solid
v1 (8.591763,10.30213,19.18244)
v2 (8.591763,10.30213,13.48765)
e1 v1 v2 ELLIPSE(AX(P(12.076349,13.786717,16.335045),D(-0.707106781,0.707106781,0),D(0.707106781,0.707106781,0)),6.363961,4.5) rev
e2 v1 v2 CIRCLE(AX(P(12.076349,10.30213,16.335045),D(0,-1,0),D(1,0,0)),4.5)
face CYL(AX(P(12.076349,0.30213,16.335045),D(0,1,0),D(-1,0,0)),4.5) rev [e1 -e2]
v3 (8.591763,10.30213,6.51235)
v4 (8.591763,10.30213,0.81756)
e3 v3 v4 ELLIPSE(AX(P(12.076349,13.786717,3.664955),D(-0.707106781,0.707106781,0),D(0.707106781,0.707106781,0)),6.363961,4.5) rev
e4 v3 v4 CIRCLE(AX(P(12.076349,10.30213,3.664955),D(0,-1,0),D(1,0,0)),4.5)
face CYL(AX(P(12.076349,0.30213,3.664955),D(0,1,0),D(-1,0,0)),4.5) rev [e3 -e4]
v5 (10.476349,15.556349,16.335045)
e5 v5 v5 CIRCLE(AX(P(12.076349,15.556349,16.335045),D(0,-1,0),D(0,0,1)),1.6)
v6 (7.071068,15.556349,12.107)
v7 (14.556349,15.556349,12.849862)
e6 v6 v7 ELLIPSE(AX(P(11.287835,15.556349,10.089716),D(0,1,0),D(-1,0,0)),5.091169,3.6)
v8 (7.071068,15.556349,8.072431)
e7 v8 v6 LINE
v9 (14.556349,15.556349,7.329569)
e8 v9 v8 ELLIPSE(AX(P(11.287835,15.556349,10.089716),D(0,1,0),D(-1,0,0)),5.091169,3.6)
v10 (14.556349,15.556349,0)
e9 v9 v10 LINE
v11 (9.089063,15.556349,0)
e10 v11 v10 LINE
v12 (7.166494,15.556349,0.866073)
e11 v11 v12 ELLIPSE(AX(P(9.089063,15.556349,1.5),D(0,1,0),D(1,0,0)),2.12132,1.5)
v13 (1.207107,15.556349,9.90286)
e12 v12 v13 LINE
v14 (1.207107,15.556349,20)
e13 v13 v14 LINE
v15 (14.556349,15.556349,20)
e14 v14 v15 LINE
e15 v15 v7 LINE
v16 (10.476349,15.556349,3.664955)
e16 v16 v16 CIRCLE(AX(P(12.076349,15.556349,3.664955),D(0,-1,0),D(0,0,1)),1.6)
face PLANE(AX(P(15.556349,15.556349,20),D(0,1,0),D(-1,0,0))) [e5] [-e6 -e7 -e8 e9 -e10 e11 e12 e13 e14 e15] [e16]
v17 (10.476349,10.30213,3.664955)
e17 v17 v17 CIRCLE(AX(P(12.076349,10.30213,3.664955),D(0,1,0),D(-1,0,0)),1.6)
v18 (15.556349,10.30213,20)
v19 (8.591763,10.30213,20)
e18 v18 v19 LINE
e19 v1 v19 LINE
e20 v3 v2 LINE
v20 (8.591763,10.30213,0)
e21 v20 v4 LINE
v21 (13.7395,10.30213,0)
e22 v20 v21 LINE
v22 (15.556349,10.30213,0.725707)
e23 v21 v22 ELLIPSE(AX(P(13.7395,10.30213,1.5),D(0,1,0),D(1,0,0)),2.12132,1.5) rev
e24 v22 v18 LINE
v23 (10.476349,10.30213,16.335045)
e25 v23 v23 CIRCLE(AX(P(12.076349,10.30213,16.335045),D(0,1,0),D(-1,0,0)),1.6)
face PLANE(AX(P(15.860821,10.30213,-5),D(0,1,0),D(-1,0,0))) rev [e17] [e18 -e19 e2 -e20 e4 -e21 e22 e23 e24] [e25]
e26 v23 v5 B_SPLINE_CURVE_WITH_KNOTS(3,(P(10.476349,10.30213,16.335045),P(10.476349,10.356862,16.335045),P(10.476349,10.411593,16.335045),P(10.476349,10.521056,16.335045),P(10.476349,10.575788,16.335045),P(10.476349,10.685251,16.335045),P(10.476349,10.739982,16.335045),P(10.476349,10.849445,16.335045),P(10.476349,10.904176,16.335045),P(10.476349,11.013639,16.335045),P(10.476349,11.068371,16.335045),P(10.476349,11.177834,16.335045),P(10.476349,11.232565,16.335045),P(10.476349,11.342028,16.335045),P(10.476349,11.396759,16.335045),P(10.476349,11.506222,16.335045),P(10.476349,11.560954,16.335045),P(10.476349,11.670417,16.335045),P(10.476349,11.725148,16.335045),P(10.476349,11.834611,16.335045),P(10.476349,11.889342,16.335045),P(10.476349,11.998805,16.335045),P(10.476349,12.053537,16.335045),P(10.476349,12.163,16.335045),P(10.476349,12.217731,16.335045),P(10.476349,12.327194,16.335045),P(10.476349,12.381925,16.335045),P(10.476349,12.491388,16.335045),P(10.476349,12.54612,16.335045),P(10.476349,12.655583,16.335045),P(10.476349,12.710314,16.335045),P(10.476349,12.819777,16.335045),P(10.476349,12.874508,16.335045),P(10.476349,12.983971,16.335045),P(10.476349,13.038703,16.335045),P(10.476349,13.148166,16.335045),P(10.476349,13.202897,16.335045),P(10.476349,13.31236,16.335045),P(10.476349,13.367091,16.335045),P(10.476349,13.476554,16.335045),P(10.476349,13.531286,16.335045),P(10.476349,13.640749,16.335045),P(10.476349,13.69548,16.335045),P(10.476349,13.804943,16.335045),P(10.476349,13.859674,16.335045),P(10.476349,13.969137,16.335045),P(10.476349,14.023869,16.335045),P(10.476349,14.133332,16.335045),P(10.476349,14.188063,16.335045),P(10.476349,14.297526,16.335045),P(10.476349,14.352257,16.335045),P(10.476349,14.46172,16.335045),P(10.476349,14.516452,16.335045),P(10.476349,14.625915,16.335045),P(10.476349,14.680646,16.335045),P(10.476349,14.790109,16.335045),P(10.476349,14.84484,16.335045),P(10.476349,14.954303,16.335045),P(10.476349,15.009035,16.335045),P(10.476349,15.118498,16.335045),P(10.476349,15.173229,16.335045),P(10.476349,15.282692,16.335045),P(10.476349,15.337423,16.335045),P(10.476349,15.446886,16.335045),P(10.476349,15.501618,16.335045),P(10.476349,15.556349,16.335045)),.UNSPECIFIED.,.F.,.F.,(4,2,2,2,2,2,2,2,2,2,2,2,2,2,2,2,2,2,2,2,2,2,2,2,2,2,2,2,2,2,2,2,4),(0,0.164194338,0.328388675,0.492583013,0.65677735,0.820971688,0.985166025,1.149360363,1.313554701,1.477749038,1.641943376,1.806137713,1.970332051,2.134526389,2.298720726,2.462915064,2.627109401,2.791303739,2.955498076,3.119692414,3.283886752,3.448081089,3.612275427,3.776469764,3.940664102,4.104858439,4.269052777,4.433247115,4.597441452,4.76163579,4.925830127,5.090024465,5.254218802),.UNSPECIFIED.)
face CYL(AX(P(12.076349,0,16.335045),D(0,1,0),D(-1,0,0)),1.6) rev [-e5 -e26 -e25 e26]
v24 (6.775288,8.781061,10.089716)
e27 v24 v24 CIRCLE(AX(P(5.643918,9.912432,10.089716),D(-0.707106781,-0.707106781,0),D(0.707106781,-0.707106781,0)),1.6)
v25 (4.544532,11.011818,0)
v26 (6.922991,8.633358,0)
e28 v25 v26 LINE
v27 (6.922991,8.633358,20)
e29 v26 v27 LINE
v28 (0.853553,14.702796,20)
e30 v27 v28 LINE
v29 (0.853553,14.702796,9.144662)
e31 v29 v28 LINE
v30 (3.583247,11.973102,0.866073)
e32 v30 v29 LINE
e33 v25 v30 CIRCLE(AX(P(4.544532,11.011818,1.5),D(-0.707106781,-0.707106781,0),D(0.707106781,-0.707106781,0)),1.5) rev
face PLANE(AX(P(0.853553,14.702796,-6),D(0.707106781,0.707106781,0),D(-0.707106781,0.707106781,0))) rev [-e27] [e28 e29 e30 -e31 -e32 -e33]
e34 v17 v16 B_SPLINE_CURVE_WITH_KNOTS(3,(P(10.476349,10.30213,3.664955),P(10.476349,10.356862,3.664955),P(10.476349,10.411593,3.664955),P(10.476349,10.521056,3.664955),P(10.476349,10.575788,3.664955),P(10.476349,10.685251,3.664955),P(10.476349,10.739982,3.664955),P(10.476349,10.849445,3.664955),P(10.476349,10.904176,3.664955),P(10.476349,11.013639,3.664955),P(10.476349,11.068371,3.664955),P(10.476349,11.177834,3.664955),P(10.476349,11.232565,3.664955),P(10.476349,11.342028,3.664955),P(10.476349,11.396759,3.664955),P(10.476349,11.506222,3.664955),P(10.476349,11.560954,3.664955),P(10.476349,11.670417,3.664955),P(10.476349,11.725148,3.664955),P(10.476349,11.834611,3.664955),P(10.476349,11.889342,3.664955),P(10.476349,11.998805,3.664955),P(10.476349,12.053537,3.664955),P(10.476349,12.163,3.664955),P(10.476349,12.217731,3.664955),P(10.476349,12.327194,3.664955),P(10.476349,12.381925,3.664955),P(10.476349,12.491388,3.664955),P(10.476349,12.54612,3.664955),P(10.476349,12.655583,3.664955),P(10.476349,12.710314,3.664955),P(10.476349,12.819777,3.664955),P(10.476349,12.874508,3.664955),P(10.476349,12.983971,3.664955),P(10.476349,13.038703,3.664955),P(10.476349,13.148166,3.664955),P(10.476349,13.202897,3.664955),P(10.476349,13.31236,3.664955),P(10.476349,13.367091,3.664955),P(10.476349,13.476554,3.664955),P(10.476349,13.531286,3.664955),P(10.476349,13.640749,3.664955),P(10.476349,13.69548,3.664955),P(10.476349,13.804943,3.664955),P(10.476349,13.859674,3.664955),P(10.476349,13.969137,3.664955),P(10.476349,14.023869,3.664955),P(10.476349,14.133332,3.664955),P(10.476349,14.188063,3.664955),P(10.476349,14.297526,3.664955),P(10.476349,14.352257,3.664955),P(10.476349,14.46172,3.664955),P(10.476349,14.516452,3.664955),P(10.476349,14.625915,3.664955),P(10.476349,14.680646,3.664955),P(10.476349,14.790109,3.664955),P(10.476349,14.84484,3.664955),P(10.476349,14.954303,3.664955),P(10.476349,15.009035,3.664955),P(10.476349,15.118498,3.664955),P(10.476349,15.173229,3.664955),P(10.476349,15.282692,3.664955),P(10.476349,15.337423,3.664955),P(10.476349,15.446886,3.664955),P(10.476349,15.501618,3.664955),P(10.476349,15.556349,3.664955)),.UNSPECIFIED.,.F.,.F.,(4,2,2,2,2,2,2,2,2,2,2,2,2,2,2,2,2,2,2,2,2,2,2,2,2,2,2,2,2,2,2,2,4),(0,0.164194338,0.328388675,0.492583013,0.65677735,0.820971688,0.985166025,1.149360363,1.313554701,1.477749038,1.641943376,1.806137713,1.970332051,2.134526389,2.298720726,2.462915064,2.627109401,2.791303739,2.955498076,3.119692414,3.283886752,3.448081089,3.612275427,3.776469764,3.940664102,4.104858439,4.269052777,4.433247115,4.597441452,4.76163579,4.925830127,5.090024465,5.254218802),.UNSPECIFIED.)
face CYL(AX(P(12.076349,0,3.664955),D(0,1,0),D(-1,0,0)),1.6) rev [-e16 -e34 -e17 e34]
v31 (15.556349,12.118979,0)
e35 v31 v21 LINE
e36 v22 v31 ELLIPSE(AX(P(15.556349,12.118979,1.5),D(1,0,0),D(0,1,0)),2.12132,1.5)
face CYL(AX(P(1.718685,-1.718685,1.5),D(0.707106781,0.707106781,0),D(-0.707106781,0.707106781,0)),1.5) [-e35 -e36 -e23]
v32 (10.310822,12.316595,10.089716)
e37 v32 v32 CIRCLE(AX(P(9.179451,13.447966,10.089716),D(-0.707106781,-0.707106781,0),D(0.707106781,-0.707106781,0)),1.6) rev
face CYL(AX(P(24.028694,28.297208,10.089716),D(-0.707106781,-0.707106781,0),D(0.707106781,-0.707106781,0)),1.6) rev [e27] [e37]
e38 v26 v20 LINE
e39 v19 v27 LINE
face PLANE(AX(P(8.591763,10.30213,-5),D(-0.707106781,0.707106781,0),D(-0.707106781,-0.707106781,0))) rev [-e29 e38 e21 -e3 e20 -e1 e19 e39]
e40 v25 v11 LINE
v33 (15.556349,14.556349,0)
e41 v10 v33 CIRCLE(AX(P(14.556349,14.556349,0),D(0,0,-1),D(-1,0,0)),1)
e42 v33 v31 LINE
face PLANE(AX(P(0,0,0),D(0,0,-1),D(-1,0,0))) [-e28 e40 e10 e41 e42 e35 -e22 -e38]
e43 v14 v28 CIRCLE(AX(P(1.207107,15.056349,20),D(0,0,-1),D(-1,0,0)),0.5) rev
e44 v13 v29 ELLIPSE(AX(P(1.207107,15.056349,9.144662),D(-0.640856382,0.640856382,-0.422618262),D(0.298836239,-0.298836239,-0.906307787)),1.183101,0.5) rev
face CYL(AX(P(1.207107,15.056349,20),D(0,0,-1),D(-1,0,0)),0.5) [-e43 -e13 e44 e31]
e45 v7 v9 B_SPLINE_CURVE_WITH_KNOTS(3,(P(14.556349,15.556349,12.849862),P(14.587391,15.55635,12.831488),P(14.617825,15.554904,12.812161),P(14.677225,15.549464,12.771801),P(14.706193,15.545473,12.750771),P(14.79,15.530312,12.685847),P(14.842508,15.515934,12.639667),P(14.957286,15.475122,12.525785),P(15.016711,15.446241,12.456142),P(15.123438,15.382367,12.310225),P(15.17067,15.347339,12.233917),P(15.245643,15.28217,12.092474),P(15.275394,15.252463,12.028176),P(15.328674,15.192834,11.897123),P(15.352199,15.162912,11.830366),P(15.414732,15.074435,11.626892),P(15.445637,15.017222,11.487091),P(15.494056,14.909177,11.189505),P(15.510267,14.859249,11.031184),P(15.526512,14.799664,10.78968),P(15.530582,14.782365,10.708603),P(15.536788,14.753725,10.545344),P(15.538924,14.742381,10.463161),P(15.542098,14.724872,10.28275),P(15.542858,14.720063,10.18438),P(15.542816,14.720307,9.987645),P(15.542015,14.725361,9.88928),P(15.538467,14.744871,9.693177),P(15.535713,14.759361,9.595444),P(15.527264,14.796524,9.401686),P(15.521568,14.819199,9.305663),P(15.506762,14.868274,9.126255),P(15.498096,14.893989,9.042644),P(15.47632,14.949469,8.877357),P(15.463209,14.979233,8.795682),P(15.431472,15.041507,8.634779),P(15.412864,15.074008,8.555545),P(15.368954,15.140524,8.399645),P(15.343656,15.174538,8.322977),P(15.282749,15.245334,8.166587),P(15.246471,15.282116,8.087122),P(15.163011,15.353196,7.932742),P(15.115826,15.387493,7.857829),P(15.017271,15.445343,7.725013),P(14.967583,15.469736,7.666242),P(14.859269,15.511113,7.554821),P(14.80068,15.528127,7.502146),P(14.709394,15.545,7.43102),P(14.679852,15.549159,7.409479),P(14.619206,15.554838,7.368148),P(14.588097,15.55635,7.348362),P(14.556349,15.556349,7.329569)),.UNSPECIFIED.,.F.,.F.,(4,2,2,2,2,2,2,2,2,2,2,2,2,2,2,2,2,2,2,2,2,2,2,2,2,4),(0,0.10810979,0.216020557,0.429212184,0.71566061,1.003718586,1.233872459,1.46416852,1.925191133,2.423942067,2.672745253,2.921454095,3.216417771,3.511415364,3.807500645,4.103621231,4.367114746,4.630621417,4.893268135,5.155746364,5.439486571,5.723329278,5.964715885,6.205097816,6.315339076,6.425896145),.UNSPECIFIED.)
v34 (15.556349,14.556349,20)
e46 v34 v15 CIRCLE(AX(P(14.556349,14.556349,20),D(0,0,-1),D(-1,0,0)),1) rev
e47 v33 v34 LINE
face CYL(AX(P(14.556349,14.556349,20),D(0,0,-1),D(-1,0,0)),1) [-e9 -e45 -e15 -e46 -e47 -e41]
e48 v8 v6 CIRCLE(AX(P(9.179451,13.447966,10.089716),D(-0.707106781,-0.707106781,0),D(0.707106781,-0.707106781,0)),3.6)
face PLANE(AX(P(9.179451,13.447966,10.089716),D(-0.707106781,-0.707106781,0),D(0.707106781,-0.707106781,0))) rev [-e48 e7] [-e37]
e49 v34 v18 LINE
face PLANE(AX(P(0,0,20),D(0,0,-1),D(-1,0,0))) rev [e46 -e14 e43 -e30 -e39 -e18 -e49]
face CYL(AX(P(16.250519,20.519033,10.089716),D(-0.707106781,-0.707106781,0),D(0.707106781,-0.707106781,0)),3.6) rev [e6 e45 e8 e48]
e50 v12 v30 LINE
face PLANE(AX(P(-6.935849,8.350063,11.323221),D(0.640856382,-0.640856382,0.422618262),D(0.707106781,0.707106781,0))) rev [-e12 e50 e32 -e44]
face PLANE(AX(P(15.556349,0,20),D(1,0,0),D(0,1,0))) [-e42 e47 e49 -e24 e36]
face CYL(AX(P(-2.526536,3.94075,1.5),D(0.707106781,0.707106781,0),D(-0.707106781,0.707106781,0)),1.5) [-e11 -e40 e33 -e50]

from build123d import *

# Parameters (mm, degrees)
BOSS_EXTRUDE1_DEPTH = 20
SKETCH6_R           = 1.6
CUT_EXTRUDE4_DEPTH  = 30.732137495
SKETCH7_R           = 2.7
CUT_EXTRUDE5_DEPTH  = 28.079952174
FILLET4_R           = 1
FILLET5_R           = 0.5
CUT_EXTRUDE6_DEPTH  = 10
CUT_EXTRUDE7_DEPTH  = 10
FILLET6_R           = 1.5
CUT_EXTRUDE8_DEPTH  = 26
SKETCH11_R          = 1.6
CUT_EXTRUDE9_DEPTH  = 26
SKETCH12_R          = 3.6
CUT_EXTRUDE10_DEPTH = 10
CUT_EXTRUDE13_DEPTH = 25
SKETCH14_R          = 4.5
CUT_EXTRUDE14_DEPTH = 10


# Read off the part's stored shape, not the designer's step: Mirror1
with BuildPart() as part:
    # Sketch1 → Boss-Extrude1 (new body)
    with BuildSketch(Plane.XY):
        Polygon((0, 0), (0, 15.556349186), (15.556349186, 0), align=None)
    extrude(amount=BOSS_EXTRUDE1_DEPTH)

    # Sketch6 → Cut-Extrude4 (cut, through all)
    with BuildSketch(Plane.ZY):
        with Locations((16.335044769, 3.48)):
            Circle(SKETCH6_R)
        with Locations((3.664955231, 3.48)):
            Circle(SKETCH6_R)
    extrude(amount=-CUT_EXTRUDE4_DEPTH, mode=Mode.SUBTRACT)

    # Sketch7 → Cut-Extrude5 (cut, through all)
    with BuildSketch(Plane.ZY.offset(-6)):
        with Locations((16.335044769, 3.48)):
            Circle(SKETCH7_R)
        with Locations((3.664955231, 3.48)):
            Circle(SKETCH7_R)
    extrude(amount=-CUT_EXTRUDE5_DEPTH, mode=Mode.SUBTRACT)

    # Fillet4
    fillet4_edges = [part.edges().sort_by_distance(p)[0] for p in [
        (0, 0, 10),
    ]]
    fillet(fillet4_edges, radius=FILLET4_R)

    # Fillet5
    # the kernel refuses this fillet: 0.5 mm, written as the material it takes off along each edge
    with BuildSketch(Plane(origin=(15.556349186, 0, -3.017766953), x_dir=(-0.7071067811865474, 0.7071067811865477, 0), z_dir=(0, 0, 1)), Plane(origin=(0, 15.556349186, -3.017766953), x_dir=(0, -1, 0), z_dir=(0, 0, 1))) as fillet5_piece_1:
        with BuildLine():
            CenterArc((FILLET5_R * 2.41421356237, FILLET5_R), FILLET5_R, 135, 135)
            Line((FILLET5_R * 1.70710678119, FILLET5_R * 1.70710678119), (0, 0))
            Line((0, 0), (FILLET5_R * 2.41421356237, 0))
        make_face()
    extrude(amount=26.035533906, mode=Mode.SUBTRACT)

    # Sketch8 → Cut-Extrude6 (cut)
    with BuildSketch(Plane(origin=(7.778174593, 7.778174593, 0), x_dir=(0, 0, -1), z_dir=(0.7071067811865477, 0.7071067811865475, 0))):
        Polygon((-20, -12.333051339), (0, -12.333051339), (0.012190886, -3.93058749), (-20, -3.93058749), align=None)
    extrude(amount=-CUT_EXTRUDE6_DEPTH, mode=Mode.SUBTRACT)

    # Sketch9 → Cut-Extrude7 (cut)
    with BuildSketch(Plane(origin=(7.778174593, 7.778174593, 0), x_dir=(0, 0, -1), z_dir=(0.7071067811865477, 0.7071067811865475, 0))):
        Polygon((-11.323221056, 10.808771842), (0, 5.528667149), (0, 10.808771842), align=None)
    extrude(amount=-CUT_EXTRUDE7_DEPTH, mode=Mode.SUBTRACT)

    # Fillet6
    fillet6_edges = [part.edges().sort_by_distance(p)[0] for p in [
        (8.058104899, 2.499414762, 0),
        (1.934408281, 9.753124344, 0),
    ]]
    fillet(fillet6_edges, radius=FILLET6_R)

    # Mirror1: part across plane


with BuildPart() as part_1:
    add(part.part)
    add(part.part.mirror(Plane(origin=(0, 15.556349186, 20), x_dir=(0, 0, 1), z_dir=(-0.7071067811865476, -0.7071067811865476, 0))))

    # Sketch10 → Cut-Extrude8 (cut)
    with BuildSketch(Plane.XY.offset(20)):
        Polygon((0.853553391, 14.702795796), (12.695020556, 2.86132863), (4.968641211, -4.865050714), (-9.455036557, 9.558627055), (-1.728657213, 17.285006399), align=None)
    extrude(amount=-CUT_EXTRUDE8_DEPTH, mode=Mode.SUBTRACT)

    # Sketch11 → Cut-Extrude9 (cut)
    with BuildSketch(Plane(origin=(7.778174593, 7.778174593, 0), x_dir=(0, 0, 1), z_dir=(-0.7071067811865477, -0.7071067811865475, 0))):
        with Locations(Location((10.089715554, 3.018295217, 0), (0, 0, 270))):
            Circle(SKETCH11_R)
    extrude(amount=-CUT_EXTRUDE9_DEPTH, mode=Mode.SUBTRACT)

    # Sketch12 → Cut-Extrude10 (cut)
    with BuildSketch(Plane(origin=(11.313708499, 11.313708499, 0), x_dir=(-0.7071067811865475, 0.7071067811865477, 0), z_dir=(-0.7071067811865477, -0.7071067811865475, 0))):
        with Locations((3.018295217, -10.089715554)):
            Circle(SKETCH12_R)
    extrude(amount=-CUT_EXTRUDE10_DEPTH, mode=Mode.SUBTRACT)

    # Sketch13 → Cut-Extrude13 (cut)
    with BuildSketch(Plane.XY.offset(20)):
        Polygon((15.86082052, 10.302130384), (8.59176281, 10.302130384), (6.922990806, 8.63335838), (10.557519661, 4.998829525), align=None)
    extrude(amount=-CUT_EXTRUDE13_DEPTH, mode=Mode.SUBTRACT)

    # Sketch14 → Cut-Extrude14 (cut)
    with BuildSketch(Plane.XZ.offset(-10.302130384)):
        with Locations((12.076349186, 16.335044769)):
            Circle(SKETCH14_R)
        with Locations((12.076349186, 3.664955231)):
            Circle(SKETCH14_R)
    extrude(amount=CUT_EXTRUDE14_DEPTH, mode=Mode.SUBTRACT)


solid = part_1.part
